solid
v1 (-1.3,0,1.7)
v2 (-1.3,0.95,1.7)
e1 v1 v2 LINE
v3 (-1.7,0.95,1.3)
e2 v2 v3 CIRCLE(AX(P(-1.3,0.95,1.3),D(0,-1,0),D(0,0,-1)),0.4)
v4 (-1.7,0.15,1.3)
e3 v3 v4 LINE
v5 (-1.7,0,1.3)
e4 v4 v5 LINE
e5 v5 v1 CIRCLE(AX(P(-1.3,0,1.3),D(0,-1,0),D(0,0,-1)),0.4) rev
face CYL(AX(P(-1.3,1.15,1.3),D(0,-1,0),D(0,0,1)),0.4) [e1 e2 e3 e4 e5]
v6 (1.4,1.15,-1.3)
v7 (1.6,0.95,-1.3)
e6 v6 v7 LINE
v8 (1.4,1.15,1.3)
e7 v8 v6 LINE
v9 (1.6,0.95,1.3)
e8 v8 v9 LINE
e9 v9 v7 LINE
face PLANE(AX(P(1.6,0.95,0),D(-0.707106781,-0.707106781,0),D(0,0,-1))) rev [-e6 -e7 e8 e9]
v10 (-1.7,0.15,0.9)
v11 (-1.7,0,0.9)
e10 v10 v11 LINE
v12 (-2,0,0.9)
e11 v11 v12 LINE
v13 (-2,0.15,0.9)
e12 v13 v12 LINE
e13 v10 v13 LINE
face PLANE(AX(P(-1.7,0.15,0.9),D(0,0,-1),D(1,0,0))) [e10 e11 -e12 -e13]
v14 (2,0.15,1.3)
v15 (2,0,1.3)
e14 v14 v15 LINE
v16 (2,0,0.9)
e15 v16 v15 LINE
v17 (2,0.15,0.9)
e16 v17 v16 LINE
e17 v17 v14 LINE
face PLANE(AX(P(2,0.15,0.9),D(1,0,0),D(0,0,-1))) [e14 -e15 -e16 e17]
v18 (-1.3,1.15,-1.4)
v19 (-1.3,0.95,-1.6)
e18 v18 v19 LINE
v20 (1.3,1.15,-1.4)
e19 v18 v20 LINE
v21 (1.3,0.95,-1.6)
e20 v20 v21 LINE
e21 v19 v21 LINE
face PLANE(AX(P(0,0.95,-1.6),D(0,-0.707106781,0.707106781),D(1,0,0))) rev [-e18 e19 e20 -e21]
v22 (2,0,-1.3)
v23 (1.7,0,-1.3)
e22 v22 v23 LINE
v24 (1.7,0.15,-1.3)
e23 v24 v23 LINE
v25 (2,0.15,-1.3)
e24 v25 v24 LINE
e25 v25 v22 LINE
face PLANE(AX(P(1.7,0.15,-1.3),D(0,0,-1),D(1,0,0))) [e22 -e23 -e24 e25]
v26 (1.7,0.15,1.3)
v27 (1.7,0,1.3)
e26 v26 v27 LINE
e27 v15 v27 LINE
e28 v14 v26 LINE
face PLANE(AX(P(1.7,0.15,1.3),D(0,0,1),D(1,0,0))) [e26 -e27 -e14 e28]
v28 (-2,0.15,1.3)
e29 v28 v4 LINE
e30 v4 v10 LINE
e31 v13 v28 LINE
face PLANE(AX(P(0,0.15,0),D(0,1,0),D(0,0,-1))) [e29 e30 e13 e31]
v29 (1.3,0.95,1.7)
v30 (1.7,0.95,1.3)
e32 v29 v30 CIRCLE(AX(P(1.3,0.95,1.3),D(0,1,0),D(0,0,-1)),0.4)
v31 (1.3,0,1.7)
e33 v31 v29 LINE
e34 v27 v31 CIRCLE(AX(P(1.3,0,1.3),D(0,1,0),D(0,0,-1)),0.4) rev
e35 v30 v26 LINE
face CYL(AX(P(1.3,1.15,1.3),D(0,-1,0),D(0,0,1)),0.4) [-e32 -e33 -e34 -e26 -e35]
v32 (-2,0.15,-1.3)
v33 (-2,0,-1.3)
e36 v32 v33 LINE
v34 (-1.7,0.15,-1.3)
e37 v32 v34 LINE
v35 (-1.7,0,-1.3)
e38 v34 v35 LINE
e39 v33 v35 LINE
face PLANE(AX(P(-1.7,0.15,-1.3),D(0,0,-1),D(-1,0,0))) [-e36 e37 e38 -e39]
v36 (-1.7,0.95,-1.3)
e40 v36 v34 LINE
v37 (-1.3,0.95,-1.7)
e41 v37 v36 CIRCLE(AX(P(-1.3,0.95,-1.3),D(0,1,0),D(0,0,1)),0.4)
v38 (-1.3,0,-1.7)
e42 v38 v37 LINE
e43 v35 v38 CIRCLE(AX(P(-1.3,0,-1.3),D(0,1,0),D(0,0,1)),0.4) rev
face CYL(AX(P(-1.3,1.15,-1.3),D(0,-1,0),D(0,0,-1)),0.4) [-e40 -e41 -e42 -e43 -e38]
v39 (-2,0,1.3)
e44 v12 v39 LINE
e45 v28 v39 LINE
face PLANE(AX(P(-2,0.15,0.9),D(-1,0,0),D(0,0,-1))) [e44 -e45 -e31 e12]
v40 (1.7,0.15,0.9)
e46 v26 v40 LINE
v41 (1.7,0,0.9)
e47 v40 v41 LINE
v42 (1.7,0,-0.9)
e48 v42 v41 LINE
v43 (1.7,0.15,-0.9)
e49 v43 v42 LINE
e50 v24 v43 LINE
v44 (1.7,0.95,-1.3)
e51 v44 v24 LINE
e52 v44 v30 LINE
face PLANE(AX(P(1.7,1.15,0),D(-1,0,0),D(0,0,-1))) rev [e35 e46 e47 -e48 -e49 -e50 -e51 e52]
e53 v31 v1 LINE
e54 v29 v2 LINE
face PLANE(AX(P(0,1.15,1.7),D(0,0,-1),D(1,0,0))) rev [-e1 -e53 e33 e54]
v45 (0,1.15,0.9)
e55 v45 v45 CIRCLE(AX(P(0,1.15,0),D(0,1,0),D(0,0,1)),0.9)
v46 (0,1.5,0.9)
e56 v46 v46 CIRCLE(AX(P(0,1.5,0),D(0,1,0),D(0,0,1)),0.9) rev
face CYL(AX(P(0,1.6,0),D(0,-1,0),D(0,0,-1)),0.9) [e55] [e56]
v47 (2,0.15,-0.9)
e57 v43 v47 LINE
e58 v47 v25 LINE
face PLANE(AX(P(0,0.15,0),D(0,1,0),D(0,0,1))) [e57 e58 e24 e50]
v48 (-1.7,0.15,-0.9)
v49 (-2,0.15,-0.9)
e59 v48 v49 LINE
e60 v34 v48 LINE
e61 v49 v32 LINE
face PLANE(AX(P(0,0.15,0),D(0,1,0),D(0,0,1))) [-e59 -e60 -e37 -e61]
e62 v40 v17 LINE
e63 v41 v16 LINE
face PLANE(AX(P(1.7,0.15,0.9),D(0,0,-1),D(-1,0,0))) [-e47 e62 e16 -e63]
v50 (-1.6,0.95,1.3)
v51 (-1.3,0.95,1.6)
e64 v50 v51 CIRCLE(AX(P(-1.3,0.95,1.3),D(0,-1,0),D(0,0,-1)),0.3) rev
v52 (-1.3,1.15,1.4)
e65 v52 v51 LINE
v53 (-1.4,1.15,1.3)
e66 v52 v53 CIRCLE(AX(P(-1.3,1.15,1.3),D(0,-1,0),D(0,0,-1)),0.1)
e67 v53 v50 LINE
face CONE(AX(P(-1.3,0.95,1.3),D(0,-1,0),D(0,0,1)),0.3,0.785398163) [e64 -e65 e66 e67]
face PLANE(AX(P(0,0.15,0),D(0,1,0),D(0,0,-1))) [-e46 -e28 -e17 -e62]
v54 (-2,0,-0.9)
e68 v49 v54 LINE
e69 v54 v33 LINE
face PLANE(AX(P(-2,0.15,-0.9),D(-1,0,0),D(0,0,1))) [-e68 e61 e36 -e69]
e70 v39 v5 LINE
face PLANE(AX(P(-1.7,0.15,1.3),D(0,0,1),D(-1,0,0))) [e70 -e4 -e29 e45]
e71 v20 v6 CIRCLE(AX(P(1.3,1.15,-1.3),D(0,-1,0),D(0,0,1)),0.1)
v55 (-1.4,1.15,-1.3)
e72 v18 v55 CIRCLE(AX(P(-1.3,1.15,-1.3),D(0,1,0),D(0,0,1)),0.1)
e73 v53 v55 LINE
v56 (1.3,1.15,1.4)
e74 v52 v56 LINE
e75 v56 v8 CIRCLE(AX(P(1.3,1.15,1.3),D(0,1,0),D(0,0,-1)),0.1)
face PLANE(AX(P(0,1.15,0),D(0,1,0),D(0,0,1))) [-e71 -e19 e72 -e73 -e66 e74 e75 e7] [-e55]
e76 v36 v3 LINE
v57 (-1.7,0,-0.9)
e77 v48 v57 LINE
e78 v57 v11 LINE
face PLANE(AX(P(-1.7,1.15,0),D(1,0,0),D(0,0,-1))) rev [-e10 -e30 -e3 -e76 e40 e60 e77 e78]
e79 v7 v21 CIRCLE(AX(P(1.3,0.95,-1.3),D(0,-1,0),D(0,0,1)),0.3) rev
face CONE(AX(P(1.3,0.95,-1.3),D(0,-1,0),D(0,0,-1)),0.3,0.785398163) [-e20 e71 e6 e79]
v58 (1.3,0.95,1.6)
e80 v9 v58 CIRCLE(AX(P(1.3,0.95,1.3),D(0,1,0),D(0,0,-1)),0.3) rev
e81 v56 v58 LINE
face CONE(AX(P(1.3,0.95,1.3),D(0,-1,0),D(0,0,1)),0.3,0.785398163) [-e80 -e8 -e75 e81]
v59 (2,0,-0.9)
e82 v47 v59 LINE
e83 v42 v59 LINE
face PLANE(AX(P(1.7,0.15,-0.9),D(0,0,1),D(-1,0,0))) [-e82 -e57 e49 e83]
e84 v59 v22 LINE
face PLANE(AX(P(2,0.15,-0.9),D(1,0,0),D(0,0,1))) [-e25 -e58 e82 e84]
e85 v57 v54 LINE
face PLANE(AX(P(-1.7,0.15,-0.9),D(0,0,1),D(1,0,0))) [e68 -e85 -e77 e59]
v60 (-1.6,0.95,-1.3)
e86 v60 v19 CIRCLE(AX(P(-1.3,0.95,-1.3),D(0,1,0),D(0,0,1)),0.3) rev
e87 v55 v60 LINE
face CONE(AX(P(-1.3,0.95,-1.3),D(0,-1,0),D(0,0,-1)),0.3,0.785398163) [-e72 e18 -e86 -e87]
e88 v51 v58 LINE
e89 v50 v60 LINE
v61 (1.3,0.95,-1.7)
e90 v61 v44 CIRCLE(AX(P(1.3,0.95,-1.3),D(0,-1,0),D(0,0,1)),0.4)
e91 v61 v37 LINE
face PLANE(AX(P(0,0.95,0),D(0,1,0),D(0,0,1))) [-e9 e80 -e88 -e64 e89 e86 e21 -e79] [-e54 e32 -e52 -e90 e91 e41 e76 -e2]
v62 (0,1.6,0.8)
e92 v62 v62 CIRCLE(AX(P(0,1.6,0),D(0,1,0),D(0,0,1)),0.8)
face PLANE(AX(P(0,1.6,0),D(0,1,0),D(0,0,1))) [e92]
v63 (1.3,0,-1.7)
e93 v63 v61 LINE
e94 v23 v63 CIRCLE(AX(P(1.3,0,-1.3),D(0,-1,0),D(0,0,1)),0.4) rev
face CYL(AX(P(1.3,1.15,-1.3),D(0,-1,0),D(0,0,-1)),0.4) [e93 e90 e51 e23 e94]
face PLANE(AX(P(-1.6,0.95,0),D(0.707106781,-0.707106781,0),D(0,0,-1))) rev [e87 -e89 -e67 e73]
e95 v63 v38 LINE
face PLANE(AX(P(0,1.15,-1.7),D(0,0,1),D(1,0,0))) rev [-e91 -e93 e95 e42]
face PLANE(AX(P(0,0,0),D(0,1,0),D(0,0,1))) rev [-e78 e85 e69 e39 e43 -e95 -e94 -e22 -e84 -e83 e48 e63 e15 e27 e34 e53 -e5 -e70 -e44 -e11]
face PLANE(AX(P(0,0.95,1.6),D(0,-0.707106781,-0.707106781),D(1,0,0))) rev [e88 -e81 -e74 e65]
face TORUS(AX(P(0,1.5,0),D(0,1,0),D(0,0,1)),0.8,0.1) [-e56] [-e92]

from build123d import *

# Parameters (mm, degrees)
SKETCH_1_W          = 1.7
SKETCH_1_H          = 1.7
EXTRUDE_1_DEPTH     = 1.15
EXTRUDE_2_DEPTH     = 0.45
SKETCH_3_W          = 0.3
SKETCH_3_H          = 0.4
EXTRUDE_3_DEPTH     = 0.15
CUT_EXTRUDE_1_DEPTH = 0.2
FILLET_1_R          = 0.4
FILLET_2_R          = 0.1
CHAMFER_1_SIZE      = 0.2
FILLET_3_R          = 0.1


with BuildPart() as part:
    # 草图1 → 凸台-拉伸1 (new body)
    with BuildSketch(Plane(origin=(0, 0, 0), x_dir=(1, 0, 0), z_dir=(0, 1, 0))):
        with Locations((-0.85, 0.85)):
            Rectangle(SKETCH_1_W, SKETCH_1_H)
    extrude(amount=EXTRUDE_1_DEPTH)

    # 草图2 → 凸台-拉伸2 (add)
    with BuildSketch(Plane(origin=(0, 1.15, 0), x_dir=(1, 0, 0), z_dir=(0, 1, 0))):
        with BuildLine():
            Line((-0.9, 0), (0, 0))
            Line((0, 0), (0, 0.9))
            ThreePointArc((0, 0.9), (-0.636396103, 0.636396103), (-0.9, 0))
        make_face()
    extrude(amount=EXTRUDE_2_DEPTH)

    # 草图3 → 凸台-拉伸3 (add)
    with BuildSketch(Plane.XZ):
        with Locations((-1.85, -1.1)):
            Rectangle(SKETCH_3_W, SKETCH_3_H)
    extrude(amount=-EXTRUDE_3_DEPTH)

    # 草图4 → 切除-拉伸1 (cut)
    with BuildSketch(Plane(origin=(0, 1.15, 0), x_dir=(1, 0, 0), z_dir=(0, 1, 0))):
        Polygon((0, 1.4), (-1.4, 1.4), (-1.4, 0), (-1.7, 0), (-1.7, 1.7), (0, 1.7), align=None)
    extrude(amount=-CUT_EXTRUDE_1_DEPTH, mode=Mode.SUBTRACT)

    # 圆角1
    fillet_1_edges = [part.edges().sort_by_distance(p)[0] for p in [
        (-1.7, 0.475, -1.7),
    ]]
    fillet(fillet_1_edges, radius=FILLET_1_R)

    # 圆角2
    fillet_2_edges = [part.edges().sort_by_distance(p)[0] for p in [
        (-1.4, 1.05, -1.4),
    ]]
    fillet(fillet_2_edges, radius=FILLET_2_R)

    # 倒角1
    chamfer_1_edges = [part.edges().sort_by_distance(p)[0] for p in [
        (-1.4, 0.95, -0.65),
        (-1.370710678, 0.95, -1.370710678),
        (-0.65, 0.95, -1.4),
    ]]
    chamfer(chamfer_1_edges, length=CHAMFER_1_SIZE - 0.0001)  # a hair under: the kernel refuses the full size

    # 圆角3
    fillet_3_edges = [part.edges().sort_by_distance(p)[0] for p in [
        (-0.636396103, 1.6, -0.636396103),
    ]]
    fillet(fillet_3_edges, radius=FILLET_3_R)

    # 镜向1: part across plane


with BuildPart() as part_1:
    add(part.part)
    add(part.part.mirror(Plane(origin=(0, 1.15, 0), x_dir=(0, 0, 1), z_dir=(-1, 0, 0))))

    # 镜向2: part across plane


with BuildPart() as part_2:
    add(part_1.part)
    add(part_1.part.mirror(Plane(origin=(0, 1.15, 0), x_dir=(1, 0, 0), z_dir=(0, 0, -1))))


solid = part_2.part
